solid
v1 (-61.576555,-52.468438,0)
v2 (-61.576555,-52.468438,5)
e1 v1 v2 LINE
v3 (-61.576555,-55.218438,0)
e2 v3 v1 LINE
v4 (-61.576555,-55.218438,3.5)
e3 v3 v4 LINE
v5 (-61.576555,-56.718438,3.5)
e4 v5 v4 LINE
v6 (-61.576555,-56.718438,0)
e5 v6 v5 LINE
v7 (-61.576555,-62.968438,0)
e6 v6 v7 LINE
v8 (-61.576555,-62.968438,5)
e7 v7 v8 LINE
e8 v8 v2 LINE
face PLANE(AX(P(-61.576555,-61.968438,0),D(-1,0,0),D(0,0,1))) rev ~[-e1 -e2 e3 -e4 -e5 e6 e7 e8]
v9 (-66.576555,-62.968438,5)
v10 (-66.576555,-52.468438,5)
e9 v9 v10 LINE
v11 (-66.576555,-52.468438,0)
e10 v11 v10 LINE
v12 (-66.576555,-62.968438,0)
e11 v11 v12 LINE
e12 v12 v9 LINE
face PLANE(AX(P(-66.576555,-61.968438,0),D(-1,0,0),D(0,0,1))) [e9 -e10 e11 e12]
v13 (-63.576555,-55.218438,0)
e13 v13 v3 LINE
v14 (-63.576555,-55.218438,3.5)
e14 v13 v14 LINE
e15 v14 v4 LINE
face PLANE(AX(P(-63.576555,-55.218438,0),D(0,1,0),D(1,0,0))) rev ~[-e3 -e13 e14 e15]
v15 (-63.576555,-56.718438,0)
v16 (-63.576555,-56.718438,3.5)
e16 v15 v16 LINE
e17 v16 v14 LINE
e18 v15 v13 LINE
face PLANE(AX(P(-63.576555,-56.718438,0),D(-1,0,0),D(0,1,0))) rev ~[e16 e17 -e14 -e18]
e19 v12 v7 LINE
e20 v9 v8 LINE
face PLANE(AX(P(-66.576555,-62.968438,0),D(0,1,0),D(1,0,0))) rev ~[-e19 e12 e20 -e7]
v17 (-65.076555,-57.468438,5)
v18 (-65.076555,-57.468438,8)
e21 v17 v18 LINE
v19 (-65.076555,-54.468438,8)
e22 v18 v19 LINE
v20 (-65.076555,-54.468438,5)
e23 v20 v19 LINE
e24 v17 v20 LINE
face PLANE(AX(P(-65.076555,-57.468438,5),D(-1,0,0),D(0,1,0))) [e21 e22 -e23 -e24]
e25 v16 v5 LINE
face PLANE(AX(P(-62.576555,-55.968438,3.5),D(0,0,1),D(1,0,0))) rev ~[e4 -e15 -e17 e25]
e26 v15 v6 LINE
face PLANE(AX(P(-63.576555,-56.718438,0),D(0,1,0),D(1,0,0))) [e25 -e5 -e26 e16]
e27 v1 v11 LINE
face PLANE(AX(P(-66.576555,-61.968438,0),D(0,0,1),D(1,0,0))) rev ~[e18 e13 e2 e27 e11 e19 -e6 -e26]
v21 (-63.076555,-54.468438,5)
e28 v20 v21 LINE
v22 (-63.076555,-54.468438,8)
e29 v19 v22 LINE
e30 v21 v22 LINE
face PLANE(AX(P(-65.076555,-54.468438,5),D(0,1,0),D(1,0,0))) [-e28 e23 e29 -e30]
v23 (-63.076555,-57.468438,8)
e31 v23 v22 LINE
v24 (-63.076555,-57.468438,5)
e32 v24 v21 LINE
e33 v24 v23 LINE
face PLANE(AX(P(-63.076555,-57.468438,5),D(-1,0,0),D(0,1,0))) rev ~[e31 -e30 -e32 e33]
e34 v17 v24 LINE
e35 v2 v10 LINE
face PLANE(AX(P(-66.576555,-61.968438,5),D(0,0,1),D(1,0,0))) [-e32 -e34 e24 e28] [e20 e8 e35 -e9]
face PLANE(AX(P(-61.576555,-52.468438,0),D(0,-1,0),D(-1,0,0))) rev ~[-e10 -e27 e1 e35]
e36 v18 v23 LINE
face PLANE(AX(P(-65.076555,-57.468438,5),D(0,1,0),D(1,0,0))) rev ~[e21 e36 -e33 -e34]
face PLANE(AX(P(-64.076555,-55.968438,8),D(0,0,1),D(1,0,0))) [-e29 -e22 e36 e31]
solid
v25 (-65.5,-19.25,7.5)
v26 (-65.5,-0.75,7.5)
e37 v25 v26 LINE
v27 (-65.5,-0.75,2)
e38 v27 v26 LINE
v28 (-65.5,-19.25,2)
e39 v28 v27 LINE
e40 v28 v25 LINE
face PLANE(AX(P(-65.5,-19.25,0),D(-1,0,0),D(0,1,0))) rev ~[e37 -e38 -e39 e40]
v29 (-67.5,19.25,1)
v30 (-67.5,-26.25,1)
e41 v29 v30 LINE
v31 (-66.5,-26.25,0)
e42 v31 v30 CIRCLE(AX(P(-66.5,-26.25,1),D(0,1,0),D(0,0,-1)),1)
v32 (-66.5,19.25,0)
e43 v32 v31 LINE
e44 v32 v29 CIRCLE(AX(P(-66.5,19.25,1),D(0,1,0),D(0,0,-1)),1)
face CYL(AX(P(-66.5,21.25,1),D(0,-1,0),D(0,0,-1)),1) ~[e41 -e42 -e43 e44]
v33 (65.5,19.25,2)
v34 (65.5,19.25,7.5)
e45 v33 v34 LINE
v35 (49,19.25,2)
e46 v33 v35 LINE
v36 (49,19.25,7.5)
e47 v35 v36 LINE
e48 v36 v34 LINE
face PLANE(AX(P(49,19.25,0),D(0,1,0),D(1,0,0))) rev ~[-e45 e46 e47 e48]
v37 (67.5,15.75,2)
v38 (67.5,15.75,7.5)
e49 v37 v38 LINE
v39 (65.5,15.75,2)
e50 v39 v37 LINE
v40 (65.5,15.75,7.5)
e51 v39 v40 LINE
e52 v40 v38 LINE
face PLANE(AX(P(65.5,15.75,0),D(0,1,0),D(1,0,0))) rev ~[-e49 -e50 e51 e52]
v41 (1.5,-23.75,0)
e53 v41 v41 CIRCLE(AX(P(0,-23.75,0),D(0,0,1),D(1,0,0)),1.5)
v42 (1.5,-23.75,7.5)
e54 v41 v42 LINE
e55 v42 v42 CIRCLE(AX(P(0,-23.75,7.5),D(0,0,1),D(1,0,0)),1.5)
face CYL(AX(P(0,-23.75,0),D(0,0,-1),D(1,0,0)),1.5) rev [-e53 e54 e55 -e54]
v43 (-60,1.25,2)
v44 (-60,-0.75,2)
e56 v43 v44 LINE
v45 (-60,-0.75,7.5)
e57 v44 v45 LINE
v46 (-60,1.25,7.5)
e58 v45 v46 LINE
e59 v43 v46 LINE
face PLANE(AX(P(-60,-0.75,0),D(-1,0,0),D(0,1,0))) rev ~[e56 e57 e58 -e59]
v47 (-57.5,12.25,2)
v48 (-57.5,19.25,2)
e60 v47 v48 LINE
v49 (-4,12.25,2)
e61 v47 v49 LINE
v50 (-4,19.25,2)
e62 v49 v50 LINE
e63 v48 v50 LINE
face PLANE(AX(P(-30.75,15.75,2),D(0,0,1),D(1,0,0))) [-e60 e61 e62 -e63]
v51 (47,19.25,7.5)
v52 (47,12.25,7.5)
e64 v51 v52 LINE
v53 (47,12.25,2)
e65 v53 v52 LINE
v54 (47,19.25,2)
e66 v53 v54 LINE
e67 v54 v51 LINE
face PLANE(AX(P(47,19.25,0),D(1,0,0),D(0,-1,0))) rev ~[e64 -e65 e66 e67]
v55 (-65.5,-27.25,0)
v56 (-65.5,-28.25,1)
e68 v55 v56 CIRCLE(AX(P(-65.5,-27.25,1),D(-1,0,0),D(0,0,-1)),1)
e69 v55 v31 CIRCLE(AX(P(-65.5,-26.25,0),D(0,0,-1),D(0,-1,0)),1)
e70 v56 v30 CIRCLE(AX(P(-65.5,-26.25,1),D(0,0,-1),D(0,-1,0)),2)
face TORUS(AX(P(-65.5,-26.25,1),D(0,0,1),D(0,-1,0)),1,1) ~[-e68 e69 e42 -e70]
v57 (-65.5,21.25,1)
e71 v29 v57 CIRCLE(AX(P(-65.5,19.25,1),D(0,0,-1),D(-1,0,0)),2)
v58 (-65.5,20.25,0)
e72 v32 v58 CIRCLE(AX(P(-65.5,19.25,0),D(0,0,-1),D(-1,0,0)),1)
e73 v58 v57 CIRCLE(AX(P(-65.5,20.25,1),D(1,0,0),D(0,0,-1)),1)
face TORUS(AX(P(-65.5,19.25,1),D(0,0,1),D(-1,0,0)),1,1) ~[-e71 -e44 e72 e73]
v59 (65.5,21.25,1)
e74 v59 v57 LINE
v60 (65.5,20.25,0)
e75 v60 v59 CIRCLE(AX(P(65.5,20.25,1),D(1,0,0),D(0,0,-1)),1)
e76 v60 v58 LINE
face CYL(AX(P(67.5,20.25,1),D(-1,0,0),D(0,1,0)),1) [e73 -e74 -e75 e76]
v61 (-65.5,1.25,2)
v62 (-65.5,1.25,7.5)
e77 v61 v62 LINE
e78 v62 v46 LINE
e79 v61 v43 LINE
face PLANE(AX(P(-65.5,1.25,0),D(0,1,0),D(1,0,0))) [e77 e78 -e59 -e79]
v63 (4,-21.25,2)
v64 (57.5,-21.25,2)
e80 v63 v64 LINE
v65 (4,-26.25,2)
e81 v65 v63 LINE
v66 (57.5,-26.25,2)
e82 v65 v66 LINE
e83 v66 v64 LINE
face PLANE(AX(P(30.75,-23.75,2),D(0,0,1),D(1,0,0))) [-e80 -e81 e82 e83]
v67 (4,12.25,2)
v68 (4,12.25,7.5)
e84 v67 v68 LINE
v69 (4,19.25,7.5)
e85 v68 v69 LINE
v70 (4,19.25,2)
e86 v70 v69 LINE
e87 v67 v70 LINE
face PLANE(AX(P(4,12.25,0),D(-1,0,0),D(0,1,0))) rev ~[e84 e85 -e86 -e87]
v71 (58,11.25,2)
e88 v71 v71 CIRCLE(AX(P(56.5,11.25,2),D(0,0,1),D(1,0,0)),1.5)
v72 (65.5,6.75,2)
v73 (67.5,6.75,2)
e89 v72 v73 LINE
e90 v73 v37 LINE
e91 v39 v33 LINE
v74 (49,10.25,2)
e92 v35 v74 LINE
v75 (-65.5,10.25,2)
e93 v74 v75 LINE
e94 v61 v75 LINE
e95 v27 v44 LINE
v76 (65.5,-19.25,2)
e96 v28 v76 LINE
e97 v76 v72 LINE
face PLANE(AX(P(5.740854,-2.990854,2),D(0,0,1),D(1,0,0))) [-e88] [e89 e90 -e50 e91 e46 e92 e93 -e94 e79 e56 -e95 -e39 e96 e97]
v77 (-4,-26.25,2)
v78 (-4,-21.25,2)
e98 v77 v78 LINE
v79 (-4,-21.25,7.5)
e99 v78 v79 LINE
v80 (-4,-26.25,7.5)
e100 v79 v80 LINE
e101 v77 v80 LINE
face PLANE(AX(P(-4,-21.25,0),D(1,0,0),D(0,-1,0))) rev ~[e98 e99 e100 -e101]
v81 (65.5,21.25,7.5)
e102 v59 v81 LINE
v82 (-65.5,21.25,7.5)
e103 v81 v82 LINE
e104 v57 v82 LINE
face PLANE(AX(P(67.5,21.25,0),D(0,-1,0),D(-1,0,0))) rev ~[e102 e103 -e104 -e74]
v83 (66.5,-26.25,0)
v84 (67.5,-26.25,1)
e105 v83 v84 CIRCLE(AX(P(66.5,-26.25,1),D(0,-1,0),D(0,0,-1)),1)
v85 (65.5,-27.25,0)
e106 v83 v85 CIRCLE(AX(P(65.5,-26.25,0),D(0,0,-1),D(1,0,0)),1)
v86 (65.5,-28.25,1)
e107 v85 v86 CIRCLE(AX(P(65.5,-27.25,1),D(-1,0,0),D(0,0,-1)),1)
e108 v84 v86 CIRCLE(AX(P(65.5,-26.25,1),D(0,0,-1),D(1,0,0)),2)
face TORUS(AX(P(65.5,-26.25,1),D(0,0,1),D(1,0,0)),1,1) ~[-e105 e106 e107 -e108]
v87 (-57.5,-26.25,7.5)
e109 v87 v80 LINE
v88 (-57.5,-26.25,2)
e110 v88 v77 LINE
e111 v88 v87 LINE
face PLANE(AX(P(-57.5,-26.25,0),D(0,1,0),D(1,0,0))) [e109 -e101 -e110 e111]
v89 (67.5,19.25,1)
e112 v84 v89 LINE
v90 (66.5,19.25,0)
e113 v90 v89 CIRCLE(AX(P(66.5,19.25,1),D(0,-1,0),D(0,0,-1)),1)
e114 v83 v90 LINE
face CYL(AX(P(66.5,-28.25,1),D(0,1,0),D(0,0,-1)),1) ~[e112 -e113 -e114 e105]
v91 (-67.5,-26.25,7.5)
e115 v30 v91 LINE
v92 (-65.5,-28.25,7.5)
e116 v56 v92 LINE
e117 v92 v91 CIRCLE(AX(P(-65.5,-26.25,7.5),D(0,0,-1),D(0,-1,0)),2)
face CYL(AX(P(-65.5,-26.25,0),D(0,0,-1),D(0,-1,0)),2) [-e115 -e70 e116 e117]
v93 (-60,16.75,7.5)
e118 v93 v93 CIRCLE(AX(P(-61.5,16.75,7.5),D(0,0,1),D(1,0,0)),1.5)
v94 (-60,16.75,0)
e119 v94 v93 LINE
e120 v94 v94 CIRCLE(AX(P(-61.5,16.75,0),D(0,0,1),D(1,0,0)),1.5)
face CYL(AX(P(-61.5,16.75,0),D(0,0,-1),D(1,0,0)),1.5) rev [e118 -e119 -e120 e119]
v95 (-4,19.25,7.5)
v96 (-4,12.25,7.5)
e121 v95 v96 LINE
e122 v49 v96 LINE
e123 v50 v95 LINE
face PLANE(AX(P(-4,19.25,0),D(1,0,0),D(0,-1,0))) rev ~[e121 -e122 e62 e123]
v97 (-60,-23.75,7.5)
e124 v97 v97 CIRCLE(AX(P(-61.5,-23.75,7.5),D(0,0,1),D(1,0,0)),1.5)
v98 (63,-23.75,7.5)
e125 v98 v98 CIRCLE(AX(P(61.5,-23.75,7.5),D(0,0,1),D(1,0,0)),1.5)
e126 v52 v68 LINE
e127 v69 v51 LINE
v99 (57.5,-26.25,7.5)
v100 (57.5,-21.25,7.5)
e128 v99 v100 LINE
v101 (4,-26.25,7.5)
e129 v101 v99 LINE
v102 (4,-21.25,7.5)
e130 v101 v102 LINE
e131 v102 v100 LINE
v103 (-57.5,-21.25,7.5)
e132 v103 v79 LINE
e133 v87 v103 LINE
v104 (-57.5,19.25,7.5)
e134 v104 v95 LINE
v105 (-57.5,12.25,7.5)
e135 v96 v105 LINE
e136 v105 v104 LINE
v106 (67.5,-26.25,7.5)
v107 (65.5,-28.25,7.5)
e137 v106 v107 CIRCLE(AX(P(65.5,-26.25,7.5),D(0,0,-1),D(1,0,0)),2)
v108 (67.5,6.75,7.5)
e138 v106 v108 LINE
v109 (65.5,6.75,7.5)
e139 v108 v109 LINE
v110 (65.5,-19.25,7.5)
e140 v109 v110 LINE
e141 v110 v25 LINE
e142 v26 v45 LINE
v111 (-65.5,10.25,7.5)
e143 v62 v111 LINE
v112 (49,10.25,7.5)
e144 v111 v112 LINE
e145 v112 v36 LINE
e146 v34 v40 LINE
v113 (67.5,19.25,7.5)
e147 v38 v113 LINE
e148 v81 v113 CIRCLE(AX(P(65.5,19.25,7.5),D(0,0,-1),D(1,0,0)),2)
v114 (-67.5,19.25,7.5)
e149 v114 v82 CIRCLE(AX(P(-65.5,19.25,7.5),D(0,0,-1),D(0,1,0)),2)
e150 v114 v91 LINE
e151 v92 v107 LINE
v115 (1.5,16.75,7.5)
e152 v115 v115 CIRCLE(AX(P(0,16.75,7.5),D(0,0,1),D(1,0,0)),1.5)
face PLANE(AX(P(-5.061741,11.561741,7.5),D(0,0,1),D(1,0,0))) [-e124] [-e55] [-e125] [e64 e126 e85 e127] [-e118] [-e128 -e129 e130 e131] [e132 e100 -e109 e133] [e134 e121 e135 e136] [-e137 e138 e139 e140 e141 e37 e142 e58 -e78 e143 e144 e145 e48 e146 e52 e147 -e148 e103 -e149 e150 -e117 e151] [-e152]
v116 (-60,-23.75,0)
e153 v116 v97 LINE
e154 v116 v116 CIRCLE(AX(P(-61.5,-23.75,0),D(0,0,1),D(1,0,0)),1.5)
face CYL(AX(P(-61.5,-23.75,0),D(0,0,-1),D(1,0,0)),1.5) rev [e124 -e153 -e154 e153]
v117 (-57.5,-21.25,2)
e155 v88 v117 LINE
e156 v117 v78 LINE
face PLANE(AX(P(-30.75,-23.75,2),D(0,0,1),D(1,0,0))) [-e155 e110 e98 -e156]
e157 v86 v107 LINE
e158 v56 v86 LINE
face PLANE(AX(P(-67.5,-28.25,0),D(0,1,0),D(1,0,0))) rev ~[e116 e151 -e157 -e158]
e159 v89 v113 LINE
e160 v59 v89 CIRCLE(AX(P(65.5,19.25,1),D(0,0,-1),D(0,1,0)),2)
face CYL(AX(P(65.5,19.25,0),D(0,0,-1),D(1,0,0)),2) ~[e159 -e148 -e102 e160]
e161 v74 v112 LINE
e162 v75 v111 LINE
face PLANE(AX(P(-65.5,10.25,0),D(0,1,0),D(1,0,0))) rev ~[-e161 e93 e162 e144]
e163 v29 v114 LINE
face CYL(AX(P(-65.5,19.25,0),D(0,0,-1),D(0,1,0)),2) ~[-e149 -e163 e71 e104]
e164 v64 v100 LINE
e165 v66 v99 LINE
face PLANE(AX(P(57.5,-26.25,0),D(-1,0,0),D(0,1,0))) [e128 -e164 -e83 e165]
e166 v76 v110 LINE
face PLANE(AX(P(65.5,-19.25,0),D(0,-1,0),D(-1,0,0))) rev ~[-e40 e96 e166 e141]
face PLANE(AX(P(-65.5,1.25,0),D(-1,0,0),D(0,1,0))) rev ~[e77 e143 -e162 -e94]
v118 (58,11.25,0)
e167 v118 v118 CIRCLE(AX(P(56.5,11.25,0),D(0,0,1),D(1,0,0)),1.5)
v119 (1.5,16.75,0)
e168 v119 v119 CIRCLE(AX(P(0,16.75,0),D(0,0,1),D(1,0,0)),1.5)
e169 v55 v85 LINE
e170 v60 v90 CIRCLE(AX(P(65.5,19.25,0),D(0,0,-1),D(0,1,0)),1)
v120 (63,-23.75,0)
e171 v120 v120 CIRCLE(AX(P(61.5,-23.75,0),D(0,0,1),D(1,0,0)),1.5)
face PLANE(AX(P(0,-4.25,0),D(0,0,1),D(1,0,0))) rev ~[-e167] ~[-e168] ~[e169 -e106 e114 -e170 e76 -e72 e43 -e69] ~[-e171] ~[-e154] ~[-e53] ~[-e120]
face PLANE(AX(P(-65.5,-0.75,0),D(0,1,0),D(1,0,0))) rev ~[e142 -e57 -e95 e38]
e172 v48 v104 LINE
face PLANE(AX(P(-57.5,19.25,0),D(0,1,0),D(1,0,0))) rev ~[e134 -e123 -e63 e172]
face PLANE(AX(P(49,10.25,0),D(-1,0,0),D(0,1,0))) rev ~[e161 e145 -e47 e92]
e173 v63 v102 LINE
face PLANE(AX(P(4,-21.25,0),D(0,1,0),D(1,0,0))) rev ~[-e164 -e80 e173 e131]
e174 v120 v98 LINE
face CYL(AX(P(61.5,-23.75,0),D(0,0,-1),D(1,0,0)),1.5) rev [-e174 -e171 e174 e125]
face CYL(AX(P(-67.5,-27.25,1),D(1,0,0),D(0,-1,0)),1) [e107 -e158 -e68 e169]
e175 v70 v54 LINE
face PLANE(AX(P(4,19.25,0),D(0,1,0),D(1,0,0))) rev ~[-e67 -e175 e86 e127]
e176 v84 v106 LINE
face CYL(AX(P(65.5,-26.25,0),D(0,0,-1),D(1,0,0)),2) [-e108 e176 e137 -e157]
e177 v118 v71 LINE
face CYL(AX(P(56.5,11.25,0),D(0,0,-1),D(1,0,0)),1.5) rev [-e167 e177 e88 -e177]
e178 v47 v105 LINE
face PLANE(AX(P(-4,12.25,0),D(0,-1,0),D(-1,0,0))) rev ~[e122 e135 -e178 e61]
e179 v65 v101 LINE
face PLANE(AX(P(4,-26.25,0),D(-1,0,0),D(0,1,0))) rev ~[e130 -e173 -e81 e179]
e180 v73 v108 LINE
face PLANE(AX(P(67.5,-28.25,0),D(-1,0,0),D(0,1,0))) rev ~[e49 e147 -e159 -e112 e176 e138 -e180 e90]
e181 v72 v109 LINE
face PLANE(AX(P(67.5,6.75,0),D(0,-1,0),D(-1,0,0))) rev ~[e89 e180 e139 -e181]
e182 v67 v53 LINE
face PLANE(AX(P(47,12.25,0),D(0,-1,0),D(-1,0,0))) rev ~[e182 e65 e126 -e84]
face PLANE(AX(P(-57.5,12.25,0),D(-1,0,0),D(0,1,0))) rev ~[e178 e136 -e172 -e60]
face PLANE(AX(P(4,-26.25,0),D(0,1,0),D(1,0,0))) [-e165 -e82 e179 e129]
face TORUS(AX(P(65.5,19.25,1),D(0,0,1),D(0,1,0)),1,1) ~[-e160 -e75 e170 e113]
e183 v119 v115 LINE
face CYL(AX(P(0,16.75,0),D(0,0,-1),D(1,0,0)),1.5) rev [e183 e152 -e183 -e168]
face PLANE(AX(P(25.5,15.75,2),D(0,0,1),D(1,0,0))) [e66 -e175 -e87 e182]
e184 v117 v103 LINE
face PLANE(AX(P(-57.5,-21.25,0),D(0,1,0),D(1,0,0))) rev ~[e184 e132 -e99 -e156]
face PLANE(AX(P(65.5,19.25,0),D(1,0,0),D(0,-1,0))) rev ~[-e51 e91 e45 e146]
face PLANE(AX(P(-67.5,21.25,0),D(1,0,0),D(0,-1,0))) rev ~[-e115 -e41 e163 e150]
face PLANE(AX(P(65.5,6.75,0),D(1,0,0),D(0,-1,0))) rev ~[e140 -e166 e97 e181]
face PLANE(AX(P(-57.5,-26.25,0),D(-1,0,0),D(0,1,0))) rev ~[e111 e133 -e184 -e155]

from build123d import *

# Parameters (mm, degrees)
F0_W         = 52
F0_H         = 22
F0_R         = 1.5
F0_W_2       = 5.5
F0_H_2       = 9
F0_H_3       = 18.5
F0_W_3       = 2
F0_W_4       = 48
F0_H_4       = 18
F1_DEPTH     = 2
F0_W_5       = 53.5
F0_H_5       = 7
F0_W_6       = 43
F0_H_6       = 5
F0_H_7       = 2
F0_W_7       = 8
F0_W_8       = 10
F2_DEPTH     = 7.5
F3_W         = 2
F3_H         = 1.5
F4_DEPTH     = 5
F5_DEPTH     = 3.5
F6_W         = 2
F6_H         = 3
F7_DEPTH     = 3
F8_R         = 1
F9_T1_DEPTH  = 12.5
F9_T4_ANGLE  = 90
F9_T6_ANGLE  = 90
F9_T8_ANGLE  = 90
F9_T10_ANGLE = 90
F10_DEPTH    = 2
F11_DEPTH    = 1
F12_DEPTH    = 2.5


# Not quite as in the source:
# - a fillet or chamfer that OpenCascade refuses, or shapes differently, is made with other operations: its cross-section is extruded or revolved along the edge and cut away or added


with BuildPart() as f1:
    # F0 (on Top) → F1 (new body)
    with BuildSketch(Plane.XY):
        Polygon((65.5, 15.75), (65.5, 19.25), (49, 19.25), (49, 10.25), (-60, 10.25), (-60, 1.25), (-60, -0.75), (-60, -19.25), (-4, -19.25), (4, -19.25), (57.5, -19.25), (65.5, -19.25), (65.5, 6.75), align=None)
        with Locations((0, -4.25)):
            Rectangle(F0_W, F0_H, mode=Mode.SUBTRACT)
        with Locations((56.5, 11.25)):
            Circle(F0_R, mode=Mode.SUBTRACT)
        with Locations((-62.75, 5.75)):
            Rectangle(F0_W_2, F0_H_2)
        with Locations((-62.75, -10)):
            Rectangle(F0_W_2, F0_H_3)
        with Locations((66.5, 11.25)):
            Rectangle(F0_W_3, F0_H_2)
        with Locations((0, -4.25)):
            Rectangle(F0_W, F0_H)
        with Locations((0, -4.25)):
            Rectangle(F0_W_4, F0_H_4, mode=Mode.SUBTRACT)
    extrude(amount=F1_DEPTH)



with BuildPart() as f1b:
    # F0 (on Top) → F1, piece 2 (new body)
    with BuildSketch(Plane.XY):
        with Locations((-30.75, 15.75)):
            Rectangle(F0_W_5, F0_H_5)
    extrude(amount=F1_DEPTH)


with BuildPart() as f1c:
    # F0 (on Top) → F1, piece 3 (new body)
    with BuildSketch(Plane.XY):
        with Locations((25.5, 15.75)):
            Rectangle(F0_W_6, F0_H_5)
    extrude(amount=F1_DEPTH)


with BuildPart() as f1d:
    # F0 (on Top) → F1, piece 4 (new body)
    with BuildSketch(Plane.XY):
        with Locations((30.75, -23.75)):
            Rectangle(F0_W_5, F0_H_6)
    extrude(amount=F1_DEPTH)


with BuildPart() as f1e:
    # F0 (on Top) → F1, piece 5 (new body)
    with BuildSketch(Plane.XY):
        with Locations((-30.75, -23.75)):
            Rectangle(F0_W_5, F0_H_6)
    extrude(amount=F1_DEPTH)


with BuildPart() as f1_1:
    add(f1.part)

    add(f1b.part)  # F2 merges F1b

    add(f1c.part)  # F2 merges F1c

    add(f1d.part)  # F2 merges F1d

    add(f1e.part)  # F2 merges F1e
    # F0 (on Top) → F2 (join)
    with BuildSketch(Plane.XY):
        Polygon((49, 10.25), (49, 19.25), (47, 19.25), (47, 12.25), (4, 12.25), (-4, 12.25), (-57.5, 12.25), (-65.5, 12.25), (-65.5, 10.25), (-60, 10.25), align=None)
        with Locations((-66.5, 11.25)):
            Rectangle(F0_W_3, F0_H_7)
        with Locations((-66.5, 5.75)):
            Rectangle(F0_W_3, F0_H_2)
        with Locations((-66.5, 0.25)):
            Rectangle(F0_W_3, F0_H_7)
        with Locations((-62.75, 0.25)):
            Rectangle(F0_W_2, F0_H_7)
        Polygon((-65.5, -19.25), (-65.5, -0.75), (-67.5, -0.75), (-67.5, -21.25), (-57.5, -21.25), (-4, -21.25), (-4, -19.25), (-60, -19.25), align=None)
        Polygon((49, 19.25), (65.5, 19.25), (65.5, 15.75), (67.5, 15.75), (67.5, 21.25), (47, 21.25), (47, 19.25), align=None)
        with Locations((0, -20.25)):
            Rectangle(F0_W_7, F0_H_7)
        with Locations((0, -23.75)):
            Rectangle(F0_W_7, F0_H_6)
        with Locations((0, -23.75)):
            Circle(F0_R, mode=Mode.SUBTRACT)
        with Locations((30.75, -20.25)):
            Rectangle(F0_W_5, F0_H_7)
        with Locations((0, -27.25)):
            Rectangle(F0_W_7, F0_H_7)
        with Locations((-30.75, -27.25)):
            Rectangle(F0_W_5, F0_H_7)
        with Locations((30.75, -27.25)):
            Rectangle(F0_W_5, F0_H_7)
        with Locations((-62.5, -23.75)):
            Rectangle(F0_W_8, F0_H_6)
        with Locations((-61.5, -23.75)):
            Circle(F0_R, mode=Mode.SUBTRACT)
        with Locations((-62.5, -27.25)):
            Rectangle(F0_W_8, F0_H_7)
        Polygon((67.5, 6.75), (65.5, 6.75), (65.5, -19.25), (57.5, -19.25), (57.5, -21.25), (67.5, -21.25), align=None)
        with Locations((62.5, -23.75)):
            Rectangle(F0_W_8, F0_H_6)
        with Locations((61.5, -23.75)):
            Circle(F0_R, mode=Mode.SUBTRACT)
        with Locations((62.5, -27.25)):
            Rectangle(F0_W_8, F0_H_7)
        with Locations((25.5, 20.25)):
            Rectangle(F0_W_6, F0_H_7)
        with Locations((0, 20.25)):
            Rectangle(F0_W_7, F0_H_7)
        with Locations((0, 15.75)):
            Rectangle(F0_W_7, F0_H_5)
        with Locations((0, 16.75)):
            Circle(F0_R, mode=Mode.SUBTRACT)
        with Locations((-61.5, 15.75)):
            Rectangle(F0_W_7, F0_H_5)
        with Locations((-61.5, 16.75)):
            Circle(F0_R, mode=Mode.SUBTRACT)
        Polygon((-65.5, 19.25), (-57.5, 19.25), (-57.5, 21.25), (-67.5, 21.25), (-67.5, 12.25), (-65.5, 12.25), align=None)
        with Locations((-30.75, 20.25)):
            Rectangle(F0_W_5, F0_H_7)
    extrude(amount=F2_DEPTH)

    # F8
    f8_edges = [f1_1.edges().sort_by_distance(p)[0] for p in [
        (67.5, -3.5, 0),
        (0, -28.25, 0),
        (0, 21.25, 0),
        (-67.5, -3.5, 0),
    ]]
    fillet(f8_edges, radius=F8_R)

    # F9: fillet of radius 2 on 4 edges, made by hand

    # F9_s2 → F9_t1 (cut)
    with BuildSketch(Plane.XY):
        with BuildLine():
            ThreePointArc((67.5, -26.25), (66.9142135624, -27.6642135624), (65.5, -28.25))
            Line((65.5, -28.25), (67.5, -28.25))
            Line((67.5, -28.25), (67.5, -26.25))
        make_face()
        with BuildLine():
            ThreePointArc((67.5, 19.25), (66.9142135624, 20.6642135624), (65.5, 21.25))
            Line((65.5, 21.25), (67.5, 21.25))
            Line((67.5, 21.25), (67.5, 19.25))
        make_face()
        with BuildLine():
            ThreePointArc((-65.5, 21.25), (-66.9142135624, 20.6642135624), (-67.5, 19.25))
            Line((-67.5, 19.25), (-67.5, 21.25))
            Line((-67.5, 21.25), (-65.5, 21.25))
        make_face()
        with BuildLine():
            ThreePointArc((-65.5, -28.25), (-66.9142135624, -27.6642135624), (-67.5, -26.25))
            Line((-67.5, -26.25), (-67.5, -28.25))
            Line((-67.5, -28.25), (-65.5, -28.25))
        make_face()
    extrude(amount=F9_T1_DEPTH, mode=Mode.SUBTRACT)

    # F9_s3 → F9_t4 (revolve, cut)
    with BuildSketch(Plane.YZ.offset(-65.5)):
        with BuildLine():
            ThreePointArc((-27.25, 0), (-27.9571067812, 0.2928932188), (-28.25, 1))
            Line((-28.25, 1), (-28.25, 0))
            Line((-28.25, 0), (-27.25, 0))
        make_face()
    revolve(axis=Axis((-65.5, -26.25, 0), (0, 0, -1)), revolution_arc=F9_T4_ANGLE, mode=Mode.SUBTRACT)

    # F9_s5 → F9_t6 (revolve, cut)
    with BuildSketch(Plane.XZ.offset(-19.25)):
        with BuildLine():
            ThreePointArc((-66.5, 0), (-67.2071067812, 0.2928932188), (-67.5, 1))
            Line((-67.5, 1), (-67.5, 0))
            Line((-67.5, 0), (-66.5, 0))
        make_face()
    revolve(axis=Axis((-65.5, 19.25, 0), (0, 0, -1)), revolution_arc=F9_T6_ANGLE, mode=Mode.SUBTRACT)

    # F9_s7 → F9_t8 (revolve, cut)
    with BuildSketch(Plane.YZ.offset(65.5)):
        with BuildLine():
            ThreePointArc((20.25, 0), (20.9571067812, 0.2928932188), (21.25, 1))
            Line((21.25, 1), (21.25, 0))
            Line((21.25, 0), (20.25, 0))
        make_face()
    revolve(axis=Axis((65.5, 19.25, 0), (0, 0, -1)), revolution_arc=F9_T8_ANGLE, mode=Mode.SUBTRACT)

    # F9_s9 → F9_t10 (revolve, cut)
    with BuildSketch(Plane.XZ.offset(26.25)):
        with BuildLine():
            ThreePointArc((66.5, 0), (67.2071067812, 0.2928932188), (67.5, 1))
            Line((67.5, 1), (67.5, 0))
            Line((67.5, 0), (66.5, 0))
        make_face()
    revolve(axis=Axis((65.5, -26.25, 0), (0, 0, -1)), revolution_arc=F9_T10_ANGLE, mode=Mode.SUBTRACT)

    # F0 (on Top) → F10 (join)
    with BuildSketch(Plane.XY):
        with Locations((0, -4.25)):
            Rectangle(F0_W_4, F0_H_4)
    extrude(amount=F10_DEPTH)


with BuildPart() as f4:
    # F3 (on Top) → F4 (new body)
    with BuildSketch(Plane.XY):
        Polygon((-61.5765547214, -49.9684383273), (-66.5765547214, -49.9684383273), (-66.5765547214, -61.9684383273), (-61.5765547214, -61.9684383273), (-61.5765547214, -56.7184383273), (-63.5765547214, -56.7184383273), (-63.5765547214, -55.2184383273), (-61.5765547214, -55.2184383273), align=None)
        with Locations((-62.5765547214, -55.9684383273)):
            Rectangle(F3_W, F3_H)
    extrude(amount=F4_DEPTH)

    # F3 (on Top) → F5 (cut)
    with BuildSketch(Plane.XY):
        with Locations((-62.5765547214, -55.9684383273)):
            Rectangle(F3_W, F3_H)
    extrude(amount=F5_DEPTH, mode=Mode.SUBTRACT)

    # F6 (on face) → F7 (join)
    with BuildSketch(Plane.XY.offset(5)):
        with Locations((-64.0765547214, -55.9684383273)):
            Rectangle(F6_W, F6_H)
    extrude(amount=F7_DEPTH)

    # F11 (add): a face of the model
    f11_faces = [f4.faces().sort_by_distance(p)[0] for p in [
        (-64.0765547214, -61.9684383273, 2.5),
    ]]
    extrude(f11_faces, amount=F11_DEPTH)

    # F12 (cut): a face of the model
    f12_faces = [f4.faces().sort_by_distance(p)[0] for p in [
        (-64.0765547214, -49.9684383273, 2.5),
    ]]
    extrude(f12_faces, amount=-F12_DEPTH, mode=Mode.SUBTRACT)


solid = Compound([f1_1.part, f4.part])
